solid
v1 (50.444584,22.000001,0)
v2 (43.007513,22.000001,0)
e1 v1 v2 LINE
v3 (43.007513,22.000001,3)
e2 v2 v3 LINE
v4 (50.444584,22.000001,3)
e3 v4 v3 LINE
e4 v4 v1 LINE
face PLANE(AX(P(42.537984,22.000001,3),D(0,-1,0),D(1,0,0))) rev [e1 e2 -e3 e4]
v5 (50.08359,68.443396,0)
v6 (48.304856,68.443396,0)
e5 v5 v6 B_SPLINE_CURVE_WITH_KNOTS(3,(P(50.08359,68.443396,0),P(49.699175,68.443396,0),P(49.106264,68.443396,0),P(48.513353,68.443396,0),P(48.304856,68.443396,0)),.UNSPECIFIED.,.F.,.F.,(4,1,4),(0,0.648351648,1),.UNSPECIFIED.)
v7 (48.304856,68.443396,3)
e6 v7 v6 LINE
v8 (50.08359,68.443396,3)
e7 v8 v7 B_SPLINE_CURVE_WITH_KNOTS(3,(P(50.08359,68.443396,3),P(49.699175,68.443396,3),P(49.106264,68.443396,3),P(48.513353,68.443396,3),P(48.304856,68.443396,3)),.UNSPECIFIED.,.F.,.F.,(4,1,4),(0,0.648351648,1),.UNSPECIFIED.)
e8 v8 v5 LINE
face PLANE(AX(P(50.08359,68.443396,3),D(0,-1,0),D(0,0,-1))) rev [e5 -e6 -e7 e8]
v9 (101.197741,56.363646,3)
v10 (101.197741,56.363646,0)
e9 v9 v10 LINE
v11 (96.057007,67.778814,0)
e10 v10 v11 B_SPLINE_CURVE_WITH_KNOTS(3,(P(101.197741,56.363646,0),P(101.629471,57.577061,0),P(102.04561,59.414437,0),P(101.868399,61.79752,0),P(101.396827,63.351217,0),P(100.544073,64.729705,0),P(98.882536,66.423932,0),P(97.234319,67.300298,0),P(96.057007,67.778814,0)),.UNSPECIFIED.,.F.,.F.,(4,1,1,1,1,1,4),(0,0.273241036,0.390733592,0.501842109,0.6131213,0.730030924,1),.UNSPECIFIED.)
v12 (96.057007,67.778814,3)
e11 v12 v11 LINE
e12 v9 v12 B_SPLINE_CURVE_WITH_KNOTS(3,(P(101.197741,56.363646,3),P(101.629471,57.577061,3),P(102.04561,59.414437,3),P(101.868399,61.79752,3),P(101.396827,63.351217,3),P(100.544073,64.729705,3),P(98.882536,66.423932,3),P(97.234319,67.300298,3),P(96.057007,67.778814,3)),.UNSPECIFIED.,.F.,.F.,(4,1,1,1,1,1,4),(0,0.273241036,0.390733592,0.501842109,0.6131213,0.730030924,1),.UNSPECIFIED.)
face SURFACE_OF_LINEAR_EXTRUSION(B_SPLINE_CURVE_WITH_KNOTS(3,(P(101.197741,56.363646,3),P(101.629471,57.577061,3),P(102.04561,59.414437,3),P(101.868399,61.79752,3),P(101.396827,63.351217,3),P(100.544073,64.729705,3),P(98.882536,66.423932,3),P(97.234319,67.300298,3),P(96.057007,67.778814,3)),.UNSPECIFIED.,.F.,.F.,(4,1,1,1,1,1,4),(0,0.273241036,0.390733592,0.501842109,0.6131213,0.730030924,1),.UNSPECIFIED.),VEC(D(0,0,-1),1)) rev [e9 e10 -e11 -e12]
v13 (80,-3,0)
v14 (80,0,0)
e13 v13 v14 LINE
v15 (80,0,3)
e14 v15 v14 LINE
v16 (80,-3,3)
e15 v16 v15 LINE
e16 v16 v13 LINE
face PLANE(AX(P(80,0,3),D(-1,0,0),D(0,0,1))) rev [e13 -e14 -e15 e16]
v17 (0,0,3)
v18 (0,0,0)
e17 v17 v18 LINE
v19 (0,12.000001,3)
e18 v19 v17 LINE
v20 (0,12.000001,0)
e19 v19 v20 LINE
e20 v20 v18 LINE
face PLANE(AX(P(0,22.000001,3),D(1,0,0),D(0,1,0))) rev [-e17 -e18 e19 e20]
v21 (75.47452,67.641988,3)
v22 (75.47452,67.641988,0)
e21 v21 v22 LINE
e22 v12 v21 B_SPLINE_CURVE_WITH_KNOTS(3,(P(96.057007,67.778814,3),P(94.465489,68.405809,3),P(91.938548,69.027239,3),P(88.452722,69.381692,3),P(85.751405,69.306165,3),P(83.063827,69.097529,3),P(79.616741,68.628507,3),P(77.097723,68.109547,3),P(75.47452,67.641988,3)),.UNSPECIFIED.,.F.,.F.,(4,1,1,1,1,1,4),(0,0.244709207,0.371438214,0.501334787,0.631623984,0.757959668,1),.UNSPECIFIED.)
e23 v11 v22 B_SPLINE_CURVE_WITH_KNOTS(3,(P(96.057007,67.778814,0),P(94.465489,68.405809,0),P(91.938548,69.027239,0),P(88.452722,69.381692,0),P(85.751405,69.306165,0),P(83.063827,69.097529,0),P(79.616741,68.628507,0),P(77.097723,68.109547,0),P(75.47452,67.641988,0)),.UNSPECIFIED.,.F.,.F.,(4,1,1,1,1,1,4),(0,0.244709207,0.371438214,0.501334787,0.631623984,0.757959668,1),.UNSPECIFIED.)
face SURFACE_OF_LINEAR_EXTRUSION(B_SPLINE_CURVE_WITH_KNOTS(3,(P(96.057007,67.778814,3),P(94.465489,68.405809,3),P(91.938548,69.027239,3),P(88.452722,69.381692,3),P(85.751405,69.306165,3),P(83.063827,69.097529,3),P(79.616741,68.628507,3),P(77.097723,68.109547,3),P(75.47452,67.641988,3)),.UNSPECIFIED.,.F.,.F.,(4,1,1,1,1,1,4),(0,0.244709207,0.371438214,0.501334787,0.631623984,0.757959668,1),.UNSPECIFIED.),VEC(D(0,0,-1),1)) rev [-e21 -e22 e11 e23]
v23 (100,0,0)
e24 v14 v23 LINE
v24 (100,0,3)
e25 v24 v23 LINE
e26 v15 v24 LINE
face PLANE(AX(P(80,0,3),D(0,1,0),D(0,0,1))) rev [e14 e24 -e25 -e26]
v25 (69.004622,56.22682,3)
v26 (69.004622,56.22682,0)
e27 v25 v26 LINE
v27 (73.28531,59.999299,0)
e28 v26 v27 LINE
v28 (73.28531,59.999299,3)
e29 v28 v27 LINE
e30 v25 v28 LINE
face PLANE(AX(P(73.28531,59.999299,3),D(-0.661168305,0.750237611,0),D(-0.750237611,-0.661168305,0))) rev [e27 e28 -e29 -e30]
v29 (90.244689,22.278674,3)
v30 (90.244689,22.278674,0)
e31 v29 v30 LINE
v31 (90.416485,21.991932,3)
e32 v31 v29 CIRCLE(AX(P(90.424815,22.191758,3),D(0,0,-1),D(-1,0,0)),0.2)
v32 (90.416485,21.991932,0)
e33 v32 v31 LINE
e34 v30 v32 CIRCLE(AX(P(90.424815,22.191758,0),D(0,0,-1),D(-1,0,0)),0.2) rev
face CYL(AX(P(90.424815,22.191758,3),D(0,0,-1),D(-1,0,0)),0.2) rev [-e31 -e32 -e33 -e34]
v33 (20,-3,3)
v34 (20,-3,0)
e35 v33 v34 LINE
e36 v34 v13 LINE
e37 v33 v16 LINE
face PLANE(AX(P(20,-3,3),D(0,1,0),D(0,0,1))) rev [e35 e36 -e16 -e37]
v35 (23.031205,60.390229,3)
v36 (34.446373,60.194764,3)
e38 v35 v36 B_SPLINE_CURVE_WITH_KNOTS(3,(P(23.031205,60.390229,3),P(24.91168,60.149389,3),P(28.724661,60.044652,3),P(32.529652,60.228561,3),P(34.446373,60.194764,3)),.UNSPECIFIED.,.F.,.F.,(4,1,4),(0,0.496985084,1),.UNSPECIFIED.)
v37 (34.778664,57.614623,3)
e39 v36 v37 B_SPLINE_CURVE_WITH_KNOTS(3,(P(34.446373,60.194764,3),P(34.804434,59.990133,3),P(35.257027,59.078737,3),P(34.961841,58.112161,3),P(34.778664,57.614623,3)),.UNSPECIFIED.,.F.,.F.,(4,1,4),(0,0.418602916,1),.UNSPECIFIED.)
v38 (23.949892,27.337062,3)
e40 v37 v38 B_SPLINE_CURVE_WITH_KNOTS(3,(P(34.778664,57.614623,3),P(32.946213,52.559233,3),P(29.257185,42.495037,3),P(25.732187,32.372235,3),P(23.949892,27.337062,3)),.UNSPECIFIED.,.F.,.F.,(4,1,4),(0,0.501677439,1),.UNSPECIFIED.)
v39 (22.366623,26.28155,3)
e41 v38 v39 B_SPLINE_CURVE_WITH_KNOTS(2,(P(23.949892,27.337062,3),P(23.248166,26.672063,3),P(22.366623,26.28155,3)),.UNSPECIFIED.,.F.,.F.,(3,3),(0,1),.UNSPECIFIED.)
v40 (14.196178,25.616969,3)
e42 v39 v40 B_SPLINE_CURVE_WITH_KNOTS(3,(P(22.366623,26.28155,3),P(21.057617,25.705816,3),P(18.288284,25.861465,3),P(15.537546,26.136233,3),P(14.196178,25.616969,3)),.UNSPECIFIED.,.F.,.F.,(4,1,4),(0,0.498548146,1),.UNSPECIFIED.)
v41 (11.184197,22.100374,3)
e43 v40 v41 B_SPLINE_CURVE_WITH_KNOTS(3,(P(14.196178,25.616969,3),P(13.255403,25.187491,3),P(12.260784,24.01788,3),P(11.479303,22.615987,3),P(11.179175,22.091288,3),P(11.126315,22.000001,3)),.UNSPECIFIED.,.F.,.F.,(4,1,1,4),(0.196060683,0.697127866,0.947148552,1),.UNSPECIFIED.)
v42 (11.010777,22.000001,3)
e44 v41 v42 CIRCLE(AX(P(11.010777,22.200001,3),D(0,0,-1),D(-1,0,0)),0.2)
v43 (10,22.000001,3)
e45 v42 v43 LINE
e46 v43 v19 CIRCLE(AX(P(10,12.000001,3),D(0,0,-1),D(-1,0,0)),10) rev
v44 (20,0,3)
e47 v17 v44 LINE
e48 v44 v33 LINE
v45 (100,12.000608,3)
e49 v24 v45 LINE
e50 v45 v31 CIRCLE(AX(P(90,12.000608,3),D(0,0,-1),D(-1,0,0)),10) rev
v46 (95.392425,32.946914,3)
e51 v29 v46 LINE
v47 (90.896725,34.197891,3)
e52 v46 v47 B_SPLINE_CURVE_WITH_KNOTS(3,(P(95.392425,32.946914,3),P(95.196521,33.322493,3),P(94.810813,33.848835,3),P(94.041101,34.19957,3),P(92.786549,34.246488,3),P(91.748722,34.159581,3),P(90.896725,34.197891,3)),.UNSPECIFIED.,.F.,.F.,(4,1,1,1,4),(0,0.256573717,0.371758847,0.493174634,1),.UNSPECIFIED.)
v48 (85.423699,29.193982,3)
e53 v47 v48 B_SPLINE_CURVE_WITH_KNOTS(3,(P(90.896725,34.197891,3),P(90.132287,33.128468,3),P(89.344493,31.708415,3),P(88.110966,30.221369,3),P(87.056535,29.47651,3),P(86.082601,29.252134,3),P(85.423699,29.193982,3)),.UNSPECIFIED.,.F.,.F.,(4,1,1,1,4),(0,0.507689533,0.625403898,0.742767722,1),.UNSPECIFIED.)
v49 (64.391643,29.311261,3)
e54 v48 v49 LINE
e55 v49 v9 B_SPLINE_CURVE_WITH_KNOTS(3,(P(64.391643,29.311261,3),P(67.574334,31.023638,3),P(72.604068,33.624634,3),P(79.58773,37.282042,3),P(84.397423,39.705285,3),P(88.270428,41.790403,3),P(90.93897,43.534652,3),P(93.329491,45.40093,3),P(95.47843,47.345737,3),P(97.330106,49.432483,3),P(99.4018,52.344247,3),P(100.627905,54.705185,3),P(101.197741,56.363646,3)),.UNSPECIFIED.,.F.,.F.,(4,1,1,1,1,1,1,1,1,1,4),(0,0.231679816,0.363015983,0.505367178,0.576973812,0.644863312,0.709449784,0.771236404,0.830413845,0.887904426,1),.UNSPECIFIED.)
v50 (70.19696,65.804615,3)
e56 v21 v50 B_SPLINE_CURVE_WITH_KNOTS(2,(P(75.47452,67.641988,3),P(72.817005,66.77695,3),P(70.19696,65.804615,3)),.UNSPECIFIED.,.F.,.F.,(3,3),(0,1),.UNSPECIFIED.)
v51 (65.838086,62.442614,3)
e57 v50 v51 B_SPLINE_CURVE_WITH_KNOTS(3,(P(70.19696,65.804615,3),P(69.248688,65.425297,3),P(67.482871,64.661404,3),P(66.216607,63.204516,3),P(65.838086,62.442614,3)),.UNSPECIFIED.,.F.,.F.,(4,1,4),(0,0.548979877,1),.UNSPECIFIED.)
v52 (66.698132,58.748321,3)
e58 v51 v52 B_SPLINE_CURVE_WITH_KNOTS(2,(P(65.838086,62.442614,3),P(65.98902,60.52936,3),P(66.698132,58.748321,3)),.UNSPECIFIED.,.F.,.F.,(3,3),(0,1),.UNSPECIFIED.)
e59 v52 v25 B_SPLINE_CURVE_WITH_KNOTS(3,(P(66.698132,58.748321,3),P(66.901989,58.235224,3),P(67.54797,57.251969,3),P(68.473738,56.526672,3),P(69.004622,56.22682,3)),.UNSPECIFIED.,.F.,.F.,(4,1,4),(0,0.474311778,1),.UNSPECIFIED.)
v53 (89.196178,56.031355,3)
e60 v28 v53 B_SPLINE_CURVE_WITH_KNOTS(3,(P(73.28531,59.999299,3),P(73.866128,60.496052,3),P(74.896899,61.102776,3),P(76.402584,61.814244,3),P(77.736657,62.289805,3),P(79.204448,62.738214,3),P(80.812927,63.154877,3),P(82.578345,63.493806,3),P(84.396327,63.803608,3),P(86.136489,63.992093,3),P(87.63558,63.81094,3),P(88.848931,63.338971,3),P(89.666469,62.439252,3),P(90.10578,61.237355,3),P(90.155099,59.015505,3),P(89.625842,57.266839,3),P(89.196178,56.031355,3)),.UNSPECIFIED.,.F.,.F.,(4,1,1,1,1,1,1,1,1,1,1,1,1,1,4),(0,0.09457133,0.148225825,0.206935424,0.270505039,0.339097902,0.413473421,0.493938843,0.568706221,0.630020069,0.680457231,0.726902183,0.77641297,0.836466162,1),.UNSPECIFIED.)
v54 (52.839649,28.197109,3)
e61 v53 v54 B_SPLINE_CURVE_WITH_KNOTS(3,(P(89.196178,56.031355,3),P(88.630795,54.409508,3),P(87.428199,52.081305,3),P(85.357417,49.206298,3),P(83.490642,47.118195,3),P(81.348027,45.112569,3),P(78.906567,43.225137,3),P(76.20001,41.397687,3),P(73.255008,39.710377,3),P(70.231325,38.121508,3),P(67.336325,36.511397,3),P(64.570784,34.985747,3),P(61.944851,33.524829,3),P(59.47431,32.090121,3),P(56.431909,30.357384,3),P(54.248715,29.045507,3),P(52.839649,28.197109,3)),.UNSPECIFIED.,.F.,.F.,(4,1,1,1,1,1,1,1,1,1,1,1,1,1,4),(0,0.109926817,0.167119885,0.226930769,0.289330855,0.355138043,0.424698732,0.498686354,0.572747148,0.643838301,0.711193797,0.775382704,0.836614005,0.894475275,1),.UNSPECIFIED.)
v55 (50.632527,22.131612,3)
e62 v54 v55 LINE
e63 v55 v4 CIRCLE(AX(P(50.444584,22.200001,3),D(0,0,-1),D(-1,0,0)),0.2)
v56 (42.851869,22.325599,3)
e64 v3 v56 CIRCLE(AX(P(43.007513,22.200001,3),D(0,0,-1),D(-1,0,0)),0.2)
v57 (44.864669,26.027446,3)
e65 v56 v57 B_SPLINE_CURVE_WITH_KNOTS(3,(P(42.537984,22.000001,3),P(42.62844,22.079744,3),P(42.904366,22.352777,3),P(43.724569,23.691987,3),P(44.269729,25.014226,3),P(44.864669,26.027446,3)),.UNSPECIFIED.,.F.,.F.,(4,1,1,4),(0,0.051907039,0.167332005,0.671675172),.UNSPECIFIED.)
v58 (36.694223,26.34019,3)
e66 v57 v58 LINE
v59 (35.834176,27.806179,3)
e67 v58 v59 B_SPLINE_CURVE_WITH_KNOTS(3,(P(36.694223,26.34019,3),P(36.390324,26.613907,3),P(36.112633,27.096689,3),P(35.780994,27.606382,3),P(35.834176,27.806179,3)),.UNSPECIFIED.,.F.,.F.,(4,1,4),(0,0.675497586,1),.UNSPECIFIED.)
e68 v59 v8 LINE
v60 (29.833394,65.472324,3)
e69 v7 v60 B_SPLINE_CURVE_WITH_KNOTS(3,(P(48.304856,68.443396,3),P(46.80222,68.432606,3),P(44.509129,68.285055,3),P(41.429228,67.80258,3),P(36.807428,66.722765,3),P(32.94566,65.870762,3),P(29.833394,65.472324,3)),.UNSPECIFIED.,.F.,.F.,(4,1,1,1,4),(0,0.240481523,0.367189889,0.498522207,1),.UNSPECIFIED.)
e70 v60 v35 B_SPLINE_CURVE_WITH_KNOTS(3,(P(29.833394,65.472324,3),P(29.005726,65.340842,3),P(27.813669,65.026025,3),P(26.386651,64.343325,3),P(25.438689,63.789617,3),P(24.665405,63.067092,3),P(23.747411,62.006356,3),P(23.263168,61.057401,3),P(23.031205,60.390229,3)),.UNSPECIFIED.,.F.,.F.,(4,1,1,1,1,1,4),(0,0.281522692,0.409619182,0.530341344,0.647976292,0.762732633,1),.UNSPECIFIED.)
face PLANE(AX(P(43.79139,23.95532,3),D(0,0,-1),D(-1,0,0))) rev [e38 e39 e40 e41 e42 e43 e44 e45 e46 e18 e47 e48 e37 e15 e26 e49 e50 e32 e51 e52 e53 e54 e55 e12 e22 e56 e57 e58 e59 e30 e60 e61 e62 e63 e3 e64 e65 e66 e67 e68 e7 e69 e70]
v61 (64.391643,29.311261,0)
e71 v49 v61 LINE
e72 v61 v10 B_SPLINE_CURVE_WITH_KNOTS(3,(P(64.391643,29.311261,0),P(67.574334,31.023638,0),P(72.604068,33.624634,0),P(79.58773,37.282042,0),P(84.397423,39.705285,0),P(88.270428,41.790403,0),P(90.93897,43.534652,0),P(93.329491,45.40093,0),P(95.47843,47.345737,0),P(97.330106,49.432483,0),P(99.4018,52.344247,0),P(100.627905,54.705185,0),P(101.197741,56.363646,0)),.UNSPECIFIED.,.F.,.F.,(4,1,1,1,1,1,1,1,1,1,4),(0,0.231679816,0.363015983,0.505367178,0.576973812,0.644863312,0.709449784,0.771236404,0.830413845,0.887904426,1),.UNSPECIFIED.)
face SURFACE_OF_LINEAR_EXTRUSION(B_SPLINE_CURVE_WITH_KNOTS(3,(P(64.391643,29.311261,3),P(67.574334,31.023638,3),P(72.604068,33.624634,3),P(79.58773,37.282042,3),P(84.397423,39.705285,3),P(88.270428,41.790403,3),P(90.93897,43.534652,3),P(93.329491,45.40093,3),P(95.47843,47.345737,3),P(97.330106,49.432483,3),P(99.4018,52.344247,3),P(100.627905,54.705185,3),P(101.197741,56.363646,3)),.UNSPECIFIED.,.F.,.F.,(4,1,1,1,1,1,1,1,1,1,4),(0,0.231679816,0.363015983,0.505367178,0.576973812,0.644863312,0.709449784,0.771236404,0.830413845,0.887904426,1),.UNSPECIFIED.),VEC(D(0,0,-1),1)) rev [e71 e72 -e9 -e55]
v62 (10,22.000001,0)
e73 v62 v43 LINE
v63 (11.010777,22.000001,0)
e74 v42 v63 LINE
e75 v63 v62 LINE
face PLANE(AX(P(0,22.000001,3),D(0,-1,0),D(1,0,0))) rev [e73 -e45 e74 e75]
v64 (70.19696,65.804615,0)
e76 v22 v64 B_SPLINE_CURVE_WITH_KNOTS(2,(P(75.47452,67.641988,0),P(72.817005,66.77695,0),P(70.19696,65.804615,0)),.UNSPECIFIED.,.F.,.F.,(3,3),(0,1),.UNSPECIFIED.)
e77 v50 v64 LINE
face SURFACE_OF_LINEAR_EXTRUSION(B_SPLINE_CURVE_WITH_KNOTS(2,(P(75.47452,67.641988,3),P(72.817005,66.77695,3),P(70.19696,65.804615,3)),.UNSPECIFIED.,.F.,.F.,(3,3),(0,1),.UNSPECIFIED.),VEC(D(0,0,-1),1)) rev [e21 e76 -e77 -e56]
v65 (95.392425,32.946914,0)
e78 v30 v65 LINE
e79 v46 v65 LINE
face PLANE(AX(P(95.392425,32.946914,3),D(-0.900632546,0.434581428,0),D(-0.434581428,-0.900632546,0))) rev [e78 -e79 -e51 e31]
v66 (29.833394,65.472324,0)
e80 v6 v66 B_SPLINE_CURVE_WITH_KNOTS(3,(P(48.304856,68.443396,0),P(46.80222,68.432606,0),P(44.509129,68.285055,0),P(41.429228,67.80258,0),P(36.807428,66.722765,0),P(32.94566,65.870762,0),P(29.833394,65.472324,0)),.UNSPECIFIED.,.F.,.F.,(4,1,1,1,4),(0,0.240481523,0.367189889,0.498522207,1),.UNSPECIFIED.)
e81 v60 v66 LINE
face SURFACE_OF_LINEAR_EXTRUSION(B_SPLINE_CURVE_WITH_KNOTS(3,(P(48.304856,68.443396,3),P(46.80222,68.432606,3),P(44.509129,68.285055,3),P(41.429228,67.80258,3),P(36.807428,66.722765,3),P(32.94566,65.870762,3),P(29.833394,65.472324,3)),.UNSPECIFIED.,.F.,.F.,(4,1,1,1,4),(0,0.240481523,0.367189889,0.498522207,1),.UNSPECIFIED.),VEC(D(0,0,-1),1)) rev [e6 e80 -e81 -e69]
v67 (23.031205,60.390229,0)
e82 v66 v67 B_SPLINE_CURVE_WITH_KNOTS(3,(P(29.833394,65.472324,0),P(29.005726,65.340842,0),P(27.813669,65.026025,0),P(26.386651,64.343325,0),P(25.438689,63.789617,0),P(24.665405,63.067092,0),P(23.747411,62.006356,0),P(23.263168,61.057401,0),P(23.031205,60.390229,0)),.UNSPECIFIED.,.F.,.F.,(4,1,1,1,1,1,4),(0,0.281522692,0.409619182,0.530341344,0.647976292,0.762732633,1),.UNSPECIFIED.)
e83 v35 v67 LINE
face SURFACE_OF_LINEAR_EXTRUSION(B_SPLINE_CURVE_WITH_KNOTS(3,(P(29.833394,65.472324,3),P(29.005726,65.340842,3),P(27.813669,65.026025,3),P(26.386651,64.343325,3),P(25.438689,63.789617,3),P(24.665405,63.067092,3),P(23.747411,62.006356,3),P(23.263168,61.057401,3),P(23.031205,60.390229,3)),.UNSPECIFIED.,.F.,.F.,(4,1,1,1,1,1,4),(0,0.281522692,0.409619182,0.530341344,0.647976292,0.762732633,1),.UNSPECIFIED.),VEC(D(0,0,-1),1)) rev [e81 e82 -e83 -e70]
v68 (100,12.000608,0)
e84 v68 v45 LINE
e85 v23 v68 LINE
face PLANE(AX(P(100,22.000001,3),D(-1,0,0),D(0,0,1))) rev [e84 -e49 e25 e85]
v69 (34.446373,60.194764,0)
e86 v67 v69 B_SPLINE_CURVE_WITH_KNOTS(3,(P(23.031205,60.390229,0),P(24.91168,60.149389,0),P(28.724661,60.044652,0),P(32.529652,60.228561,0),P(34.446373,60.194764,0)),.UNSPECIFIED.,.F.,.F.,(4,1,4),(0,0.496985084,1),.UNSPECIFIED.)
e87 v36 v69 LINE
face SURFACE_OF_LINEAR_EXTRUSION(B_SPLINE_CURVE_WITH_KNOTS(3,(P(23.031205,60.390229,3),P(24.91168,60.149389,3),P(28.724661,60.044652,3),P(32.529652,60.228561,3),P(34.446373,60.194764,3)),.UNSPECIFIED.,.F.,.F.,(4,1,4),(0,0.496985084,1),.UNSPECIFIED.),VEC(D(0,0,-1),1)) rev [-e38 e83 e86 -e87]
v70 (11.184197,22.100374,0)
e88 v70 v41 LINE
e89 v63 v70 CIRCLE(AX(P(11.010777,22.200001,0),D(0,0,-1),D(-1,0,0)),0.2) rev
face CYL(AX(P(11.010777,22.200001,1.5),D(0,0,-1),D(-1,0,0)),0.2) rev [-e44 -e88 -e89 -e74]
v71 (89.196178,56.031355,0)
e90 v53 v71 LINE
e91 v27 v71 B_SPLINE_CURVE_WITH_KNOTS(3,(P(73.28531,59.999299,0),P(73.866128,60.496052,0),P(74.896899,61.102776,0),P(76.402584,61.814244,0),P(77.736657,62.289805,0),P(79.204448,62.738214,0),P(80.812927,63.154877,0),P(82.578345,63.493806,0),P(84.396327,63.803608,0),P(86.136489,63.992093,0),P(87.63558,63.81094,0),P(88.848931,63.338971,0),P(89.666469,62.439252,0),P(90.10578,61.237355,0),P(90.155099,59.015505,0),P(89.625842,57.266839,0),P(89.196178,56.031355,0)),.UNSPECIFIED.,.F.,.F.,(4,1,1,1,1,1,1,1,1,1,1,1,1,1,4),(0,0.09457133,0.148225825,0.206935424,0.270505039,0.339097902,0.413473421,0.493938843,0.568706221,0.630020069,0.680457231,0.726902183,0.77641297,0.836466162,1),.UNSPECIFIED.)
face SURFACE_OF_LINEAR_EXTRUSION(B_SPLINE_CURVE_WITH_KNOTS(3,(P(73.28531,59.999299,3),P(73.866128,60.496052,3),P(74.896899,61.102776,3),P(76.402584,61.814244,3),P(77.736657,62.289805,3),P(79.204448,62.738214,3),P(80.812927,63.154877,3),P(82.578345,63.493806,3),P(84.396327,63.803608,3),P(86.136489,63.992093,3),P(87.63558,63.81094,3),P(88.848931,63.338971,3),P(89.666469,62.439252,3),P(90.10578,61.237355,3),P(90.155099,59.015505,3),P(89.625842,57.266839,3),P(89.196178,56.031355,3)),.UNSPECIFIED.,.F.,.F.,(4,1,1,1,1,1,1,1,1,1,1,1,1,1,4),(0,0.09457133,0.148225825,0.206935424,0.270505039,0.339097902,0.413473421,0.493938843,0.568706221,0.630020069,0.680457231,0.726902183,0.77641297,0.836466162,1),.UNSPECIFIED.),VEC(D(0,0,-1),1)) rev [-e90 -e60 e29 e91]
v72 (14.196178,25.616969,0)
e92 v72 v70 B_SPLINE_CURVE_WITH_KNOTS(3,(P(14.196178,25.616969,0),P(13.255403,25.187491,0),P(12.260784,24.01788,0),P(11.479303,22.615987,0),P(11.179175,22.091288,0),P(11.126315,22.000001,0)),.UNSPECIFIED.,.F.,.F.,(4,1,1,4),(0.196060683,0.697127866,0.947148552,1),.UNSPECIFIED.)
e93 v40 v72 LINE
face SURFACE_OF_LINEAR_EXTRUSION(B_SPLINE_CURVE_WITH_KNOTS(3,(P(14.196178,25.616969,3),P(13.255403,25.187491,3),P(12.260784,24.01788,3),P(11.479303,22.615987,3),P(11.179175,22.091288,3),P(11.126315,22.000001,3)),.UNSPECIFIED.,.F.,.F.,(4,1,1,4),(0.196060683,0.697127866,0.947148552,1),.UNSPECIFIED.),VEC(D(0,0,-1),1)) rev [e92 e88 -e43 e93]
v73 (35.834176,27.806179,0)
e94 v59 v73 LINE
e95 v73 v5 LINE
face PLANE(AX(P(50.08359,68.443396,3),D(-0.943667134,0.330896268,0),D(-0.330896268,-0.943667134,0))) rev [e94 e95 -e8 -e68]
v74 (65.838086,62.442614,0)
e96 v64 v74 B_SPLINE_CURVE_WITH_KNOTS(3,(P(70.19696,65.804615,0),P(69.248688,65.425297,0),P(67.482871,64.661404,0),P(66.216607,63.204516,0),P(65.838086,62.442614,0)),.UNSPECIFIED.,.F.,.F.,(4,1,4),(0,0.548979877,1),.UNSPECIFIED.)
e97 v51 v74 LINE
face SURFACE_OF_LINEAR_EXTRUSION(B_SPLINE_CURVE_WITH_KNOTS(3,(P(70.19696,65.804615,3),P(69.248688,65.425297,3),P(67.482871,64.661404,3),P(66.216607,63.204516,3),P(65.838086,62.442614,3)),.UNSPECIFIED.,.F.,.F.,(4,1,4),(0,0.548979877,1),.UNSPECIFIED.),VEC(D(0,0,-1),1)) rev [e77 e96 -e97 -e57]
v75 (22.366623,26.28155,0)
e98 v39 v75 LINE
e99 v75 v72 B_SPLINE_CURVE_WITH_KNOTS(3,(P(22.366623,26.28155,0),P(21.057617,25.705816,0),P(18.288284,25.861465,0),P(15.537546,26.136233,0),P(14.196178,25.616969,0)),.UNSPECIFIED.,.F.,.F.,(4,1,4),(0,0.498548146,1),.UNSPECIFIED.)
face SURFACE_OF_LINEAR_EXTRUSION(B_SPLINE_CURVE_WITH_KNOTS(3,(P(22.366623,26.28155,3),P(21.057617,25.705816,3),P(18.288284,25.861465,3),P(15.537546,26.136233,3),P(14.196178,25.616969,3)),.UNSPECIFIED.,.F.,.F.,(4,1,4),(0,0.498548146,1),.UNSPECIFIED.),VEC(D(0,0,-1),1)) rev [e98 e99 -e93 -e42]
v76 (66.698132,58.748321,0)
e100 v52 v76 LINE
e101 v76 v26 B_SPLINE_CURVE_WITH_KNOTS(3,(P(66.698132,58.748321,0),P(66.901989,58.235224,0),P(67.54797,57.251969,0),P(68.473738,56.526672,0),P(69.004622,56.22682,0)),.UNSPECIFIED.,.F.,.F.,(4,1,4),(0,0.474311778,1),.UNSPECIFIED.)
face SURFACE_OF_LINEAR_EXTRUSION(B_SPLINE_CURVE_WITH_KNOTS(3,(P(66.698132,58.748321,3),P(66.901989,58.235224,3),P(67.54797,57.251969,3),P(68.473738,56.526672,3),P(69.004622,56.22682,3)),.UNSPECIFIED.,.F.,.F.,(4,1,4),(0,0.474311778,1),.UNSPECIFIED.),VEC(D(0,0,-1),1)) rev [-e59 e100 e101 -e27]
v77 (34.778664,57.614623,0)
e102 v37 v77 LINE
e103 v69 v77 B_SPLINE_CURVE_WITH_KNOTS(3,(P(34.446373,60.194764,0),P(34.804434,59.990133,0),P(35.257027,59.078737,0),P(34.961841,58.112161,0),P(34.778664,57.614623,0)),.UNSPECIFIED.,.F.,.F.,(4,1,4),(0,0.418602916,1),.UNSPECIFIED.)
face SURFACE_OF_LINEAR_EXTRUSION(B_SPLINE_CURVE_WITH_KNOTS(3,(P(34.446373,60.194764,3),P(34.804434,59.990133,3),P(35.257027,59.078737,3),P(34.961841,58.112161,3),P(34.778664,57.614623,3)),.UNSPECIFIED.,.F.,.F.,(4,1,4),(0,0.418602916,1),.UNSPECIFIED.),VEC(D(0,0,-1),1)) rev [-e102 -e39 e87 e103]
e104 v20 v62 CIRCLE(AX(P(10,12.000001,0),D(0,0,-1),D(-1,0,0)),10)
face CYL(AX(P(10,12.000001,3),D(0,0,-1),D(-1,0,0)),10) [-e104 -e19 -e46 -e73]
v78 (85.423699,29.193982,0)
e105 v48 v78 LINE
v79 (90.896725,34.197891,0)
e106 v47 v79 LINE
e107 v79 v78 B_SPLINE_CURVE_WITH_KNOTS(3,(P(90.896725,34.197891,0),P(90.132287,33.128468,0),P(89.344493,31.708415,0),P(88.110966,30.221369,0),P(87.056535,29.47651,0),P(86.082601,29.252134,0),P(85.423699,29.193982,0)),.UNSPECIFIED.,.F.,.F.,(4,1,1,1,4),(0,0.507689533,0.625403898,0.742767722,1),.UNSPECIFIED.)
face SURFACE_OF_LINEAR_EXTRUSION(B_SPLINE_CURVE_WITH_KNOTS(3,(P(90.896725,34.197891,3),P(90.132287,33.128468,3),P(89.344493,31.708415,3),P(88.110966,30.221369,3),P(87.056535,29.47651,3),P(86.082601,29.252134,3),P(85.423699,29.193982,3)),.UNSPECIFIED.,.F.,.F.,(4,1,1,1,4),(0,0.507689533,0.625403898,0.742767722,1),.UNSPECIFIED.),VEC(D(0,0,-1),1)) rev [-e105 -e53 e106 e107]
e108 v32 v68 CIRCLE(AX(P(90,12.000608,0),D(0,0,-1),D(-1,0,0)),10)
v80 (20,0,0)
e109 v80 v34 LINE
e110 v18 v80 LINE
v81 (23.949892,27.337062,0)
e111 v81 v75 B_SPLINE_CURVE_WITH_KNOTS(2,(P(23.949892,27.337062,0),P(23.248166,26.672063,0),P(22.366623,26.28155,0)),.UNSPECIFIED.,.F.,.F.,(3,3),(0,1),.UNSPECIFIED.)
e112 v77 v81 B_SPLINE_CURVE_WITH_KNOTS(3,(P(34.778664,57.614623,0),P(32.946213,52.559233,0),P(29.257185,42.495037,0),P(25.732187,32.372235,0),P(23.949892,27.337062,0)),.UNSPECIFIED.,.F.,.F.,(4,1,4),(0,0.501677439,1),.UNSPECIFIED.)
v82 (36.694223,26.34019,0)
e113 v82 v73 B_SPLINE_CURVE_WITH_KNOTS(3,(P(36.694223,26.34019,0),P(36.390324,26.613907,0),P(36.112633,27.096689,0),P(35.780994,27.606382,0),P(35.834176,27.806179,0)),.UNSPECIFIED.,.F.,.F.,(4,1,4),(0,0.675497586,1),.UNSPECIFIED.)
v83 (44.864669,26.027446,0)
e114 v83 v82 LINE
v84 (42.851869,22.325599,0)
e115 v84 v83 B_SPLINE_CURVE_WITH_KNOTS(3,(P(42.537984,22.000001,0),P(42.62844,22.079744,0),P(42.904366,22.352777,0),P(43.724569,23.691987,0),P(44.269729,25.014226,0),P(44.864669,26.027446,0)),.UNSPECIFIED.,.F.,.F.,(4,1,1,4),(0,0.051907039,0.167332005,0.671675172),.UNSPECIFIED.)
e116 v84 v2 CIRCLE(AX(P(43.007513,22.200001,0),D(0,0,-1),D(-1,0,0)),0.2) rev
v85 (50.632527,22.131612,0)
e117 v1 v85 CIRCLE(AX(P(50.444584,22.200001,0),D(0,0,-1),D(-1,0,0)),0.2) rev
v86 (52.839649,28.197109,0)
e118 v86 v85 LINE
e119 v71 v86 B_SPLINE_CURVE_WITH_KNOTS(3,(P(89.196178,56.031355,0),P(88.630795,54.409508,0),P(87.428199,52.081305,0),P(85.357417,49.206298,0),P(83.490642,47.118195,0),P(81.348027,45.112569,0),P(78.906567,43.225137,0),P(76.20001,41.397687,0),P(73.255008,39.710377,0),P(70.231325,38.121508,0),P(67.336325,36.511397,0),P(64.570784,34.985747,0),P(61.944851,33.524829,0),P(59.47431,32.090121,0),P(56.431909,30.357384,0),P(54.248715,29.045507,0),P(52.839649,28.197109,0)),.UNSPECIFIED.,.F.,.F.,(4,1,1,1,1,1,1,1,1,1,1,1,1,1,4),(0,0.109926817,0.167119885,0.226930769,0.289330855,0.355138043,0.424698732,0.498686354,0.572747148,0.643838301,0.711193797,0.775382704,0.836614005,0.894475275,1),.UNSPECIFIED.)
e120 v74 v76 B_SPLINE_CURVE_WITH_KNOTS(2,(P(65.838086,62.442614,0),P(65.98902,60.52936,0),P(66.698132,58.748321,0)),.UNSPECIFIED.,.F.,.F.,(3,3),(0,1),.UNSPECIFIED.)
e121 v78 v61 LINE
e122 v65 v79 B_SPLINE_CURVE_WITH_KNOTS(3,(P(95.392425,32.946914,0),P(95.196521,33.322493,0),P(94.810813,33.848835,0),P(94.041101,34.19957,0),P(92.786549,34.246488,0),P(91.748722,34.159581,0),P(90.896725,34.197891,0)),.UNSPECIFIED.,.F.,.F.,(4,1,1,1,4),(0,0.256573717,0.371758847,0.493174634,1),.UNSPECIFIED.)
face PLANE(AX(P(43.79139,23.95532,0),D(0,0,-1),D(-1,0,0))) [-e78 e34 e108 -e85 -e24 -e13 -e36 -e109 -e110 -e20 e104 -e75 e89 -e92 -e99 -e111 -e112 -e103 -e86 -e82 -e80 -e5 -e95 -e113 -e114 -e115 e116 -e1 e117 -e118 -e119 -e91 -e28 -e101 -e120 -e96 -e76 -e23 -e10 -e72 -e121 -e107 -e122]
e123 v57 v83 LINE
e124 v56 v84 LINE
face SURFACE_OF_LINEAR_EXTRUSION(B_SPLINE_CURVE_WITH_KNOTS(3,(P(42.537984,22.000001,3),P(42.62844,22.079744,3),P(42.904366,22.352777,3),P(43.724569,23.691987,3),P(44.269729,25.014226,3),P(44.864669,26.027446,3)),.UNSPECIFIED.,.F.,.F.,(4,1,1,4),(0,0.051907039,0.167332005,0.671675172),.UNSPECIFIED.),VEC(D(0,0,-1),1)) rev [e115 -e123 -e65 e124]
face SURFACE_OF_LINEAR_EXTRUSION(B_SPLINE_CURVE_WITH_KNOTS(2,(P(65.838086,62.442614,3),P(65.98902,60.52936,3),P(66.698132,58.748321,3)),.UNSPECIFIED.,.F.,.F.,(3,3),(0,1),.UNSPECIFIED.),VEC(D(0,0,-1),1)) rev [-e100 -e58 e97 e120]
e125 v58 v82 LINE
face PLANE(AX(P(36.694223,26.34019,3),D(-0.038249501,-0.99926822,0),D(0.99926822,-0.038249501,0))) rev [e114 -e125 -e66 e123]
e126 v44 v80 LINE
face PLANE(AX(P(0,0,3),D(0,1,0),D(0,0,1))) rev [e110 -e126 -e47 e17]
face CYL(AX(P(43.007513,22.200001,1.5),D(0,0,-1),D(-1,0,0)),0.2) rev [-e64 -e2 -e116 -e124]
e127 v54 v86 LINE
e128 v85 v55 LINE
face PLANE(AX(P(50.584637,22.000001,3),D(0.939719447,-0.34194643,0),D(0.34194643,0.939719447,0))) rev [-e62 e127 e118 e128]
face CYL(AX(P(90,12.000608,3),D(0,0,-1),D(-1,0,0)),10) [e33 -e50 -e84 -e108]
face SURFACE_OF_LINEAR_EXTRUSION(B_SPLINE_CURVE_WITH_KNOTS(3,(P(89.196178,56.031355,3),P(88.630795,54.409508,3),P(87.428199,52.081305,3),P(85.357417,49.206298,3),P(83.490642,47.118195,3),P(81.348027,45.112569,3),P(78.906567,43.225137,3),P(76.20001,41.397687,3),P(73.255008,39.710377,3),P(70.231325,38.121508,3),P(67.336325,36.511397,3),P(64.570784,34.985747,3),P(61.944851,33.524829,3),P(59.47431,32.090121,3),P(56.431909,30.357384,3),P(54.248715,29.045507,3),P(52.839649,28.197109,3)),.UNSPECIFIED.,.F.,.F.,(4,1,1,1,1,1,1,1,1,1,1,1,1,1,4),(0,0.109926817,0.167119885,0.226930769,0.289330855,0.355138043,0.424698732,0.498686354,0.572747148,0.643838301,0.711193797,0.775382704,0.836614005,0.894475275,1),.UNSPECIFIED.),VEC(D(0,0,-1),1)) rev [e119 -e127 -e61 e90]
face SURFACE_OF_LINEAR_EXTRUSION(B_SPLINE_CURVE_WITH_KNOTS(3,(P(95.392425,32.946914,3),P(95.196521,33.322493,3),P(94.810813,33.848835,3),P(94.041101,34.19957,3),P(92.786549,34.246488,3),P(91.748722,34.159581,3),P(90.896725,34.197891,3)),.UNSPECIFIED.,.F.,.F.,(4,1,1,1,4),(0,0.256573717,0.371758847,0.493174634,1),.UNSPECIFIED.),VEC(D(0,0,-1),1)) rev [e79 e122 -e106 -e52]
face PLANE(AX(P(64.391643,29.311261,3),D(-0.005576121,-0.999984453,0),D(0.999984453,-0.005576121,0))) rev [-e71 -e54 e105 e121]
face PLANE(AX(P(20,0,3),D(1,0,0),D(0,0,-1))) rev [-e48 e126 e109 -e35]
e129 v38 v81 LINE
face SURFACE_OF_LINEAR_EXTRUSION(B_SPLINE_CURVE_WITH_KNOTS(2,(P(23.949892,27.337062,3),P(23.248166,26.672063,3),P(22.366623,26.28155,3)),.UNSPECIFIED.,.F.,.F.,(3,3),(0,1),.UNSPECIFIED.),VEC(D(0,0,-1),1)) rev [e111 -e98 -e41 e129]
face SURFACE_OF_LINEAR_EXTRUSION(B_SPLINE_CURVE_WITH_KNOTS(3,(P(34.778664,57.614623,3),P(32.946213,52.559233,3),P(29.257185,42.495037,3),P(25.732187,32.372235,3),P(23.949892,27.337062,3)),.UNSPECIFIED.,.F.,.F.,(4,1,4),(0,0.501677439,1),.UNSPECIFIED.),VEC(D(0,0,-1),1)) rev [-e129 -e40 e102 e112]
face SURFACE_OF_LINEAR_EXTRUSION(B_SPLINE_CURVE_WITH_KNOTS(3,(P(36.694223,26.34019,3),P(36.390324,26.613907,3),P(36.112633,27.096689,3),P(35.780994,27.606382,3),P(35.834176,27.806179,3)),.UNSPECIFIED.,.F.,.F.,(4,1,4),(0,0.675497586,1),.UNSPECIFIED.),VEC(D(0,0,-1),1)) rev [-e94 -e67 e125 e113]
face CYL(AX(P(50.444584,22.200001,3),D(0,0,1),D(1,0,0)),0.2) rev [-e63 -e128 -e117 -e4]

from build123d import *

# Parameters (mm, degrees)
BOSS_EXTRUDE1_DEPTH = 3
FILLET1_R           = 10
FILLET2_R           = 0.2


with BuildPart() as part:
    # Sketch1 → Boss-Extrude1 (new body)
    with BuildSketch(Plane.XY):
        with BuildLine():
            Line((42.537984076, 22.000000982), (50.584636746, 22.000000982))
            Line((50.584636746, 22.000000982), (52.839649235, 28.197109379))
            add(Edge.make_bspline(
                [(52.839649235, 28.197109379), (54.248714684, 29.045506519), (56.431909075, 30.357383962), (59.474309712, 32.090120544), (61.944850647, 33.524828625), (64.570783761, 34.985747142), (67.336324518, 36.511397195), (70.231324588, 38.121508187), (73.255007633, 39.710376785), (76.200009812, 41.39768715), (78.906567156, 43.225136503), (81.348027085, 45.112569426), (83.490641674, 47.118195151), (85.357416855, 49.206298383), (87.428198995, 52.081305478), (88.630794744, 54.409507668), (89.196177773, 56.031354884)],
                knots=[0, 0, 0, 0, 0.105524725, 0.163385995, 0.224617296, 0.288806203, 0.356161699, 0.427252852, 0.501313646, 0.575301268, 0.644861957, 0.710669145, 0.773069231, 0.832880115, 0.890073183, 1, 1, 1, 1], degree=3))
            add(Edge.make_bspline(
                [(89.196177773, 56.031354884), (89.625842409, 57.266839405), (90.155099381, 59.015505319), (90.105779781, 61.237355295), (89.66646939, 62.439251642), (88.84893126, 63.338971158), (87.635580146, 63.810940124), (86.136489342, 63.992093331), (84.396326749, 63.803607869), (82.578344606, 63.493806461), (80.812926713, 63.154877277), (79.204447684, 62.73821432), (77.736657379, 62.289804925), (76.402583676, 61.814244169), (74.896898698, 61.102776297), (73.866127773, 60.496052109), (73.285309908, 59.99929859)],
                knots=[0, 0, 0, 0, 0.163533838, 0.22358703, 0.273097817, 0.319542769, 0.369979931, 0.431293779, 0.506061157, 0.586526579, 0.660902098, 0.729494961, 0.793064576, 0.851774175, 0.90542867, 1, 1, 1, 1], degree=3))
            Line((73.285309908, 59.99929859), (69.00462187, 56.226820091))
            add(Edge.make_bspline(
                [(69.00462187, 56.226820091), (68.473738468, 56.526672064), (67.547969563, 57.251968605), (66.901989109, 58.235224326), (66.698132425, 58.748321264)],
                knots=[0, 0, 0, 0, 0.525688222, 1, 1, 1, 1], degree=3))
            add(Edge.make_bspline(
                [(66.698132425, 58.748321264), (65.989020109, 60.529360233), (65.838085514, 62.44261368)],
                knots=[0, 0, 0, 1, 1, 1], degree=2))
            add(Edge.make_bspline(
                [(65.838085514, 62.44261368), (66.216607319, 63.204516033), (67.48287064, 64.66140426), (69.248688382, 65.425296692), (70.196959634, 65.804615243)],
                knots=[0, 0, 0, 0, 0.451020123, 1, 1, 1, 1], degree=3))
            add(Edge.make_bspline(
                [(70.196959634, 65.804615243), (72.817005486, 66.776950367), (75.474520228, 67.641988191)],
                knots=[0, 0, 0, 1, 1, 1], degree=2))
            add(Edge.make_bspline(
                [(75.474520228, 67.641988191), (77.097723123, 68.109547469), (79.616741412, 68.628507184), (83.063826554, 69.097528685), (85.75140454, 69.30616535), (88.452721605, 69.381691523), (91.938548042, 69.027238786), (94.465489273, 68.405808951), (96.057006546, 67.778813836)],
                knots=[0, 0, 0, 0, 0.242040332, 0.368376016, 0.498665213, 0.628561786, 0.755290793, 1, 1, 1, 1], degree=3))
            add(Edge.make_bspline(
                [(96.057006546, 67.778813836), (97.234318545, 67.300298489), (98.882536444, 66.423932293), (100.544073343, 64.729705469), (101.396826889, 63.351216745), (101.868398713, 61.797519742), (102.045609891, 59.41443702), (101.629471012, 57.577060636), (101.197741495, 56.363645736)],
                knots=[0, 0, 0, 0, 0.269969076, 0.3868787, 0.498157891, 0.609266408, 0.726758964, 1, 1, 1, 1], degree=3))
            add(Edge.make_bspline(
                [(101.197741495, 56.363645736), (100.627905221, 54.705185204), (99.401800162, 52.344246797), (97.33010629, 49.432482993), (95.47843029, 47.345736731), (93.329490859, 45.400929794), (90.938970266, 43.534651518), (88.270428499, 41.790403458), (84.397423166, 39.705285051), (79.587729815, 37.28204241), (72.604067537, 33.62463429), (67.574334477, 31.023637696), (64.39164298, 29.31126106)],
                knots=[0, 0, 0, 0, 0.112095574, 0.169586155, 0.228763596, 0.290550216, 0.355136688, 0.423026188, 0.494632822, 0.636984017, 0.768320184, 1, 1, 1, 1], degree=3))
            Line((64.39164298, 29.31126106), (85.423699274, 29.193981936))
            add(Edge.make_bspline(
                [(85.423699274, 29.193981936), (86.082600666, 29.252133566), (87.056534892, 29.476510222), (88.110965689, 30.221368973), (89.344492612, 31.708414679), (90.132287268, 33.128468355), (90.896725076, 34.19789124)],
                knots=[0, 0, 0, 0, 0.257232278, 0.374596102, 0.492310467, 1, 1, 1, 1], degree=3))
            add(Edge.make_bspline(
                [(90.896725076, 34.19789124), (91.748722118, 34.159580523), (92.786549209, 34.246487699), (94.041100815, 34.199570399), (94.810812918, 33.848834983), (95.196520755, 33.322492941), (95.392424841, 32.946913914)],
                knots=[0, 0, 0, 0, 0.506825366, 0.628241153, 0.743426283, 1, 1, 1, 1], degree=3))
            Line((95.392424841, 32.946913914), (90.110220598, 22.000000982))
            Line((90.110220598, 22.000000982), (100, 22.000000982))
            Line((100, 22.000000982), (100, 0))
            Line((100, 0), (80, 0))
            Line((80, 0), (80, -3))
            Line((80, -3), (20, -3))
            Line((20, -3), (20, 0))
            Line((20, 0), (0, 0))
            Line((0, 0), (0, 22.000000982))
            Line((0, 22.000000982), (11.126314779, 22.000000982))
            add(Edge.make_bspline(
                [(11.126314779, 22.000000982), (11.179175101, 22.091287797), (11.479303034, 22.615987108), (12.260783592, 24.017880313), (13.255402926, 25.187491124), (14.196177773, 25.616968644)],
                knots=[0.196060683, 0.196060683, 0.196060683, 0.196060683, 0.24891213, 0.498932816, 1, 1, 1, 1], degree=3))
            add(Edge.make_bspline(
                [(14.196177773, 25.616968644), (15.537546067, 26.136232655), (18.288283832, 25.861464595), (21.057617255, 25.705816495), (22.366623434, 26.281550349)],
                knots=[0, 0, 0, 0, 0.501451854, 1, 1, 1, 1], degree=3))
            add(Edge.make_bspline(
                [(22.366623434, 26.281550349), (23.248166371, 26.672062902), (23.949891612, 27.337062468)],
                knots=[0, 0, 0, 1, 1, 1], degree=2))
            add(Edge.make_bspline(
                [(23.949891612, 27.337062468), (25.732187491, 32.372235468), (29.257184693, 42.495036723), (32.946212686, 52.559233475), (34.778664091, 57.614623062)],
                knots=[0, 0, 0, 0, 0.498322561, 1, 1, 1, 1], degree=3))
            add(Edge.make_bspline(
                [(34.778664091, 57.614623062), (34.961841156, 58.112161275), (35.257027284, 59.078737049), (34.804433512, 59.990132521), (34.446373238, 60.194763797)],
                knots=[0, 0, 0, 0, 0.581397084, 1, 1, 1, 1], degree=3))
            add(Edge.make_bspline(
                [(34.446373238, 60.194763797), (32.529652356, 60.228560869), (28.724661476, 60.044652466), (24.911679757, 60.149389343), (23.031205138, 60.390229004)],
                knots=[0, 0, 0, 0, 0.503014916, 1, 1, 1, 1], degree=3))
            add(Edge.make_bspline(
                [(23.031205138, 60.390229004), (23.263167648, 61.057401499), (23.747411258, 62.006355534), (24.665405373, 63.067091706), (25.438689115, 63.789616743), (26.386650807, 64.343325333), (27.813668818, 65.026024955), (29.005726498, 65.340841829), (29.833394349, 65.472324391)],
                knots=[0, 0, 0, 0, 0.237267367, 0.352023708, 0.469658656, 0.590380818, 0.718477308, 1, 1, 1, 1], degree=3))
            add(Edge.make_bspline(
                [(29.833394349, 65.472324391), (32.945660374, 65.870761534), (36.807427968, 66.722765492), (41.429227523, 67.802579697), (44.509128617, 68.285055442), (46.80221991, 68.432605881), (48.304856428, 68.44339554)],
                knots=[0, 0, 0, 0, 0.501477793, 0.632810111, 0.759518477, 1, 1, 1, 1], degree=3))
            add(Edge.make_bspline(
                [(48.304856428, 68.44339554), (48.513352649, 68.44339554), (49.106263778, 68.44339554), (49.699174906, 68.44339554), (50.083589814, 68.44339554)],
                knots=[0, 0, 0, 0, 0.351648352, 1, 1, 1, 1], degree=3))
            Line((50.083589814, 68.44339554), (35.834176209, 27.806178965))
            add(Edge.make_bspline(
                [(35.834176209, 27.806178965), (35.780993555, 27.60638247), (36.11263329, 27.096689411), (36.390323638, 26.613906537), (36.694223121, 26.340189911)],
                knots=[0, 0, 0, 0, 0.324502414, 1, 1, 1, 1], degree=3))
            Line((36.694223121, 26.340189911), (44.864668782, 26.02744558))
            add(Edge.make_bspline(
                [(44.864668782, 26.02744558), (44.269729217, 25.014226453), (43.724569108, 23.691987076), (42.904365523, 22.352776547), (42.628440441, 22.079744483), (42.537984076, 22.000000982)],
                knots=[0, 0, 0, 0, 0.504343167, 0.619768133, 0.671675172, 0.671675172, 0.671675172, 0.671675172], degree=3))
        make_face()
    extrude(amount=BOSS_EXTRUDE1_DEPTH)

    # Fillet1
    # the kernel refuses this fillet: 10 mm, written as the material it takes off along each edge
    with BuildSketch(Plane(origin=(100, 22.000000982, -25), x_dir=(-1, 0, 0), z_dir=(0, 0, 1))) as fillet1_piece_1_section:
        with BuildLine():
            CenterArc((FILLET1_R, FILLET1_R), FILLET1_R, 180, 90)
            Line((0, FILLET1_R), (0, 0))
            Line((0, 0), (FILLET1_R, 0))
        make_face()
    fillet1_piece_1 = extrude(amount=53, mode=Mode.PRIVATE)
    fillet1_piece_1 = split(fillet1_piece_1, bisect_by=Plane(origin=(90.664979053, 23.149690057, 1.5), z_dir=(0.9006325457122767, -0.4345814280475224, 0)), keep=Keep.TOP, mode=Mode.PRIVATE)
    add(fillet1_piece_1, mode=Mode.SUBTRACT)
    with BuildSketch(Plane(origin=(0, 22.000000982, -25), x_dir=(0, -1, 0), z_dir=(0, 0, 1))) as fillet1_piece_2:
        with BuildLine():
            CenterArc((FILLET1_R, FILLET1_R), FILLET1_R, 180, 90)
            Line((0, FILLET1_R), (0, 0))
            Line((0, 0), (FILLET1_R, 0))
        make_face()
    extrude(amount=53, mode=Mode.SUBTRACT)

    # Fillet2
    fillet2_edges = [part.edges().sort_by_distance(p)[0] for p in [
        (90.109929036, 21.999396745, 1.5),
        (42.537984076, 22.000000982, 1.5),
        (50.584636746, 22.000000982, 1.5),
        (11.126314779, 22.000000982, 1.5),
    ]]
    fillet(fillet2_edges, radius=FILLET2_R)


solid = part.part
